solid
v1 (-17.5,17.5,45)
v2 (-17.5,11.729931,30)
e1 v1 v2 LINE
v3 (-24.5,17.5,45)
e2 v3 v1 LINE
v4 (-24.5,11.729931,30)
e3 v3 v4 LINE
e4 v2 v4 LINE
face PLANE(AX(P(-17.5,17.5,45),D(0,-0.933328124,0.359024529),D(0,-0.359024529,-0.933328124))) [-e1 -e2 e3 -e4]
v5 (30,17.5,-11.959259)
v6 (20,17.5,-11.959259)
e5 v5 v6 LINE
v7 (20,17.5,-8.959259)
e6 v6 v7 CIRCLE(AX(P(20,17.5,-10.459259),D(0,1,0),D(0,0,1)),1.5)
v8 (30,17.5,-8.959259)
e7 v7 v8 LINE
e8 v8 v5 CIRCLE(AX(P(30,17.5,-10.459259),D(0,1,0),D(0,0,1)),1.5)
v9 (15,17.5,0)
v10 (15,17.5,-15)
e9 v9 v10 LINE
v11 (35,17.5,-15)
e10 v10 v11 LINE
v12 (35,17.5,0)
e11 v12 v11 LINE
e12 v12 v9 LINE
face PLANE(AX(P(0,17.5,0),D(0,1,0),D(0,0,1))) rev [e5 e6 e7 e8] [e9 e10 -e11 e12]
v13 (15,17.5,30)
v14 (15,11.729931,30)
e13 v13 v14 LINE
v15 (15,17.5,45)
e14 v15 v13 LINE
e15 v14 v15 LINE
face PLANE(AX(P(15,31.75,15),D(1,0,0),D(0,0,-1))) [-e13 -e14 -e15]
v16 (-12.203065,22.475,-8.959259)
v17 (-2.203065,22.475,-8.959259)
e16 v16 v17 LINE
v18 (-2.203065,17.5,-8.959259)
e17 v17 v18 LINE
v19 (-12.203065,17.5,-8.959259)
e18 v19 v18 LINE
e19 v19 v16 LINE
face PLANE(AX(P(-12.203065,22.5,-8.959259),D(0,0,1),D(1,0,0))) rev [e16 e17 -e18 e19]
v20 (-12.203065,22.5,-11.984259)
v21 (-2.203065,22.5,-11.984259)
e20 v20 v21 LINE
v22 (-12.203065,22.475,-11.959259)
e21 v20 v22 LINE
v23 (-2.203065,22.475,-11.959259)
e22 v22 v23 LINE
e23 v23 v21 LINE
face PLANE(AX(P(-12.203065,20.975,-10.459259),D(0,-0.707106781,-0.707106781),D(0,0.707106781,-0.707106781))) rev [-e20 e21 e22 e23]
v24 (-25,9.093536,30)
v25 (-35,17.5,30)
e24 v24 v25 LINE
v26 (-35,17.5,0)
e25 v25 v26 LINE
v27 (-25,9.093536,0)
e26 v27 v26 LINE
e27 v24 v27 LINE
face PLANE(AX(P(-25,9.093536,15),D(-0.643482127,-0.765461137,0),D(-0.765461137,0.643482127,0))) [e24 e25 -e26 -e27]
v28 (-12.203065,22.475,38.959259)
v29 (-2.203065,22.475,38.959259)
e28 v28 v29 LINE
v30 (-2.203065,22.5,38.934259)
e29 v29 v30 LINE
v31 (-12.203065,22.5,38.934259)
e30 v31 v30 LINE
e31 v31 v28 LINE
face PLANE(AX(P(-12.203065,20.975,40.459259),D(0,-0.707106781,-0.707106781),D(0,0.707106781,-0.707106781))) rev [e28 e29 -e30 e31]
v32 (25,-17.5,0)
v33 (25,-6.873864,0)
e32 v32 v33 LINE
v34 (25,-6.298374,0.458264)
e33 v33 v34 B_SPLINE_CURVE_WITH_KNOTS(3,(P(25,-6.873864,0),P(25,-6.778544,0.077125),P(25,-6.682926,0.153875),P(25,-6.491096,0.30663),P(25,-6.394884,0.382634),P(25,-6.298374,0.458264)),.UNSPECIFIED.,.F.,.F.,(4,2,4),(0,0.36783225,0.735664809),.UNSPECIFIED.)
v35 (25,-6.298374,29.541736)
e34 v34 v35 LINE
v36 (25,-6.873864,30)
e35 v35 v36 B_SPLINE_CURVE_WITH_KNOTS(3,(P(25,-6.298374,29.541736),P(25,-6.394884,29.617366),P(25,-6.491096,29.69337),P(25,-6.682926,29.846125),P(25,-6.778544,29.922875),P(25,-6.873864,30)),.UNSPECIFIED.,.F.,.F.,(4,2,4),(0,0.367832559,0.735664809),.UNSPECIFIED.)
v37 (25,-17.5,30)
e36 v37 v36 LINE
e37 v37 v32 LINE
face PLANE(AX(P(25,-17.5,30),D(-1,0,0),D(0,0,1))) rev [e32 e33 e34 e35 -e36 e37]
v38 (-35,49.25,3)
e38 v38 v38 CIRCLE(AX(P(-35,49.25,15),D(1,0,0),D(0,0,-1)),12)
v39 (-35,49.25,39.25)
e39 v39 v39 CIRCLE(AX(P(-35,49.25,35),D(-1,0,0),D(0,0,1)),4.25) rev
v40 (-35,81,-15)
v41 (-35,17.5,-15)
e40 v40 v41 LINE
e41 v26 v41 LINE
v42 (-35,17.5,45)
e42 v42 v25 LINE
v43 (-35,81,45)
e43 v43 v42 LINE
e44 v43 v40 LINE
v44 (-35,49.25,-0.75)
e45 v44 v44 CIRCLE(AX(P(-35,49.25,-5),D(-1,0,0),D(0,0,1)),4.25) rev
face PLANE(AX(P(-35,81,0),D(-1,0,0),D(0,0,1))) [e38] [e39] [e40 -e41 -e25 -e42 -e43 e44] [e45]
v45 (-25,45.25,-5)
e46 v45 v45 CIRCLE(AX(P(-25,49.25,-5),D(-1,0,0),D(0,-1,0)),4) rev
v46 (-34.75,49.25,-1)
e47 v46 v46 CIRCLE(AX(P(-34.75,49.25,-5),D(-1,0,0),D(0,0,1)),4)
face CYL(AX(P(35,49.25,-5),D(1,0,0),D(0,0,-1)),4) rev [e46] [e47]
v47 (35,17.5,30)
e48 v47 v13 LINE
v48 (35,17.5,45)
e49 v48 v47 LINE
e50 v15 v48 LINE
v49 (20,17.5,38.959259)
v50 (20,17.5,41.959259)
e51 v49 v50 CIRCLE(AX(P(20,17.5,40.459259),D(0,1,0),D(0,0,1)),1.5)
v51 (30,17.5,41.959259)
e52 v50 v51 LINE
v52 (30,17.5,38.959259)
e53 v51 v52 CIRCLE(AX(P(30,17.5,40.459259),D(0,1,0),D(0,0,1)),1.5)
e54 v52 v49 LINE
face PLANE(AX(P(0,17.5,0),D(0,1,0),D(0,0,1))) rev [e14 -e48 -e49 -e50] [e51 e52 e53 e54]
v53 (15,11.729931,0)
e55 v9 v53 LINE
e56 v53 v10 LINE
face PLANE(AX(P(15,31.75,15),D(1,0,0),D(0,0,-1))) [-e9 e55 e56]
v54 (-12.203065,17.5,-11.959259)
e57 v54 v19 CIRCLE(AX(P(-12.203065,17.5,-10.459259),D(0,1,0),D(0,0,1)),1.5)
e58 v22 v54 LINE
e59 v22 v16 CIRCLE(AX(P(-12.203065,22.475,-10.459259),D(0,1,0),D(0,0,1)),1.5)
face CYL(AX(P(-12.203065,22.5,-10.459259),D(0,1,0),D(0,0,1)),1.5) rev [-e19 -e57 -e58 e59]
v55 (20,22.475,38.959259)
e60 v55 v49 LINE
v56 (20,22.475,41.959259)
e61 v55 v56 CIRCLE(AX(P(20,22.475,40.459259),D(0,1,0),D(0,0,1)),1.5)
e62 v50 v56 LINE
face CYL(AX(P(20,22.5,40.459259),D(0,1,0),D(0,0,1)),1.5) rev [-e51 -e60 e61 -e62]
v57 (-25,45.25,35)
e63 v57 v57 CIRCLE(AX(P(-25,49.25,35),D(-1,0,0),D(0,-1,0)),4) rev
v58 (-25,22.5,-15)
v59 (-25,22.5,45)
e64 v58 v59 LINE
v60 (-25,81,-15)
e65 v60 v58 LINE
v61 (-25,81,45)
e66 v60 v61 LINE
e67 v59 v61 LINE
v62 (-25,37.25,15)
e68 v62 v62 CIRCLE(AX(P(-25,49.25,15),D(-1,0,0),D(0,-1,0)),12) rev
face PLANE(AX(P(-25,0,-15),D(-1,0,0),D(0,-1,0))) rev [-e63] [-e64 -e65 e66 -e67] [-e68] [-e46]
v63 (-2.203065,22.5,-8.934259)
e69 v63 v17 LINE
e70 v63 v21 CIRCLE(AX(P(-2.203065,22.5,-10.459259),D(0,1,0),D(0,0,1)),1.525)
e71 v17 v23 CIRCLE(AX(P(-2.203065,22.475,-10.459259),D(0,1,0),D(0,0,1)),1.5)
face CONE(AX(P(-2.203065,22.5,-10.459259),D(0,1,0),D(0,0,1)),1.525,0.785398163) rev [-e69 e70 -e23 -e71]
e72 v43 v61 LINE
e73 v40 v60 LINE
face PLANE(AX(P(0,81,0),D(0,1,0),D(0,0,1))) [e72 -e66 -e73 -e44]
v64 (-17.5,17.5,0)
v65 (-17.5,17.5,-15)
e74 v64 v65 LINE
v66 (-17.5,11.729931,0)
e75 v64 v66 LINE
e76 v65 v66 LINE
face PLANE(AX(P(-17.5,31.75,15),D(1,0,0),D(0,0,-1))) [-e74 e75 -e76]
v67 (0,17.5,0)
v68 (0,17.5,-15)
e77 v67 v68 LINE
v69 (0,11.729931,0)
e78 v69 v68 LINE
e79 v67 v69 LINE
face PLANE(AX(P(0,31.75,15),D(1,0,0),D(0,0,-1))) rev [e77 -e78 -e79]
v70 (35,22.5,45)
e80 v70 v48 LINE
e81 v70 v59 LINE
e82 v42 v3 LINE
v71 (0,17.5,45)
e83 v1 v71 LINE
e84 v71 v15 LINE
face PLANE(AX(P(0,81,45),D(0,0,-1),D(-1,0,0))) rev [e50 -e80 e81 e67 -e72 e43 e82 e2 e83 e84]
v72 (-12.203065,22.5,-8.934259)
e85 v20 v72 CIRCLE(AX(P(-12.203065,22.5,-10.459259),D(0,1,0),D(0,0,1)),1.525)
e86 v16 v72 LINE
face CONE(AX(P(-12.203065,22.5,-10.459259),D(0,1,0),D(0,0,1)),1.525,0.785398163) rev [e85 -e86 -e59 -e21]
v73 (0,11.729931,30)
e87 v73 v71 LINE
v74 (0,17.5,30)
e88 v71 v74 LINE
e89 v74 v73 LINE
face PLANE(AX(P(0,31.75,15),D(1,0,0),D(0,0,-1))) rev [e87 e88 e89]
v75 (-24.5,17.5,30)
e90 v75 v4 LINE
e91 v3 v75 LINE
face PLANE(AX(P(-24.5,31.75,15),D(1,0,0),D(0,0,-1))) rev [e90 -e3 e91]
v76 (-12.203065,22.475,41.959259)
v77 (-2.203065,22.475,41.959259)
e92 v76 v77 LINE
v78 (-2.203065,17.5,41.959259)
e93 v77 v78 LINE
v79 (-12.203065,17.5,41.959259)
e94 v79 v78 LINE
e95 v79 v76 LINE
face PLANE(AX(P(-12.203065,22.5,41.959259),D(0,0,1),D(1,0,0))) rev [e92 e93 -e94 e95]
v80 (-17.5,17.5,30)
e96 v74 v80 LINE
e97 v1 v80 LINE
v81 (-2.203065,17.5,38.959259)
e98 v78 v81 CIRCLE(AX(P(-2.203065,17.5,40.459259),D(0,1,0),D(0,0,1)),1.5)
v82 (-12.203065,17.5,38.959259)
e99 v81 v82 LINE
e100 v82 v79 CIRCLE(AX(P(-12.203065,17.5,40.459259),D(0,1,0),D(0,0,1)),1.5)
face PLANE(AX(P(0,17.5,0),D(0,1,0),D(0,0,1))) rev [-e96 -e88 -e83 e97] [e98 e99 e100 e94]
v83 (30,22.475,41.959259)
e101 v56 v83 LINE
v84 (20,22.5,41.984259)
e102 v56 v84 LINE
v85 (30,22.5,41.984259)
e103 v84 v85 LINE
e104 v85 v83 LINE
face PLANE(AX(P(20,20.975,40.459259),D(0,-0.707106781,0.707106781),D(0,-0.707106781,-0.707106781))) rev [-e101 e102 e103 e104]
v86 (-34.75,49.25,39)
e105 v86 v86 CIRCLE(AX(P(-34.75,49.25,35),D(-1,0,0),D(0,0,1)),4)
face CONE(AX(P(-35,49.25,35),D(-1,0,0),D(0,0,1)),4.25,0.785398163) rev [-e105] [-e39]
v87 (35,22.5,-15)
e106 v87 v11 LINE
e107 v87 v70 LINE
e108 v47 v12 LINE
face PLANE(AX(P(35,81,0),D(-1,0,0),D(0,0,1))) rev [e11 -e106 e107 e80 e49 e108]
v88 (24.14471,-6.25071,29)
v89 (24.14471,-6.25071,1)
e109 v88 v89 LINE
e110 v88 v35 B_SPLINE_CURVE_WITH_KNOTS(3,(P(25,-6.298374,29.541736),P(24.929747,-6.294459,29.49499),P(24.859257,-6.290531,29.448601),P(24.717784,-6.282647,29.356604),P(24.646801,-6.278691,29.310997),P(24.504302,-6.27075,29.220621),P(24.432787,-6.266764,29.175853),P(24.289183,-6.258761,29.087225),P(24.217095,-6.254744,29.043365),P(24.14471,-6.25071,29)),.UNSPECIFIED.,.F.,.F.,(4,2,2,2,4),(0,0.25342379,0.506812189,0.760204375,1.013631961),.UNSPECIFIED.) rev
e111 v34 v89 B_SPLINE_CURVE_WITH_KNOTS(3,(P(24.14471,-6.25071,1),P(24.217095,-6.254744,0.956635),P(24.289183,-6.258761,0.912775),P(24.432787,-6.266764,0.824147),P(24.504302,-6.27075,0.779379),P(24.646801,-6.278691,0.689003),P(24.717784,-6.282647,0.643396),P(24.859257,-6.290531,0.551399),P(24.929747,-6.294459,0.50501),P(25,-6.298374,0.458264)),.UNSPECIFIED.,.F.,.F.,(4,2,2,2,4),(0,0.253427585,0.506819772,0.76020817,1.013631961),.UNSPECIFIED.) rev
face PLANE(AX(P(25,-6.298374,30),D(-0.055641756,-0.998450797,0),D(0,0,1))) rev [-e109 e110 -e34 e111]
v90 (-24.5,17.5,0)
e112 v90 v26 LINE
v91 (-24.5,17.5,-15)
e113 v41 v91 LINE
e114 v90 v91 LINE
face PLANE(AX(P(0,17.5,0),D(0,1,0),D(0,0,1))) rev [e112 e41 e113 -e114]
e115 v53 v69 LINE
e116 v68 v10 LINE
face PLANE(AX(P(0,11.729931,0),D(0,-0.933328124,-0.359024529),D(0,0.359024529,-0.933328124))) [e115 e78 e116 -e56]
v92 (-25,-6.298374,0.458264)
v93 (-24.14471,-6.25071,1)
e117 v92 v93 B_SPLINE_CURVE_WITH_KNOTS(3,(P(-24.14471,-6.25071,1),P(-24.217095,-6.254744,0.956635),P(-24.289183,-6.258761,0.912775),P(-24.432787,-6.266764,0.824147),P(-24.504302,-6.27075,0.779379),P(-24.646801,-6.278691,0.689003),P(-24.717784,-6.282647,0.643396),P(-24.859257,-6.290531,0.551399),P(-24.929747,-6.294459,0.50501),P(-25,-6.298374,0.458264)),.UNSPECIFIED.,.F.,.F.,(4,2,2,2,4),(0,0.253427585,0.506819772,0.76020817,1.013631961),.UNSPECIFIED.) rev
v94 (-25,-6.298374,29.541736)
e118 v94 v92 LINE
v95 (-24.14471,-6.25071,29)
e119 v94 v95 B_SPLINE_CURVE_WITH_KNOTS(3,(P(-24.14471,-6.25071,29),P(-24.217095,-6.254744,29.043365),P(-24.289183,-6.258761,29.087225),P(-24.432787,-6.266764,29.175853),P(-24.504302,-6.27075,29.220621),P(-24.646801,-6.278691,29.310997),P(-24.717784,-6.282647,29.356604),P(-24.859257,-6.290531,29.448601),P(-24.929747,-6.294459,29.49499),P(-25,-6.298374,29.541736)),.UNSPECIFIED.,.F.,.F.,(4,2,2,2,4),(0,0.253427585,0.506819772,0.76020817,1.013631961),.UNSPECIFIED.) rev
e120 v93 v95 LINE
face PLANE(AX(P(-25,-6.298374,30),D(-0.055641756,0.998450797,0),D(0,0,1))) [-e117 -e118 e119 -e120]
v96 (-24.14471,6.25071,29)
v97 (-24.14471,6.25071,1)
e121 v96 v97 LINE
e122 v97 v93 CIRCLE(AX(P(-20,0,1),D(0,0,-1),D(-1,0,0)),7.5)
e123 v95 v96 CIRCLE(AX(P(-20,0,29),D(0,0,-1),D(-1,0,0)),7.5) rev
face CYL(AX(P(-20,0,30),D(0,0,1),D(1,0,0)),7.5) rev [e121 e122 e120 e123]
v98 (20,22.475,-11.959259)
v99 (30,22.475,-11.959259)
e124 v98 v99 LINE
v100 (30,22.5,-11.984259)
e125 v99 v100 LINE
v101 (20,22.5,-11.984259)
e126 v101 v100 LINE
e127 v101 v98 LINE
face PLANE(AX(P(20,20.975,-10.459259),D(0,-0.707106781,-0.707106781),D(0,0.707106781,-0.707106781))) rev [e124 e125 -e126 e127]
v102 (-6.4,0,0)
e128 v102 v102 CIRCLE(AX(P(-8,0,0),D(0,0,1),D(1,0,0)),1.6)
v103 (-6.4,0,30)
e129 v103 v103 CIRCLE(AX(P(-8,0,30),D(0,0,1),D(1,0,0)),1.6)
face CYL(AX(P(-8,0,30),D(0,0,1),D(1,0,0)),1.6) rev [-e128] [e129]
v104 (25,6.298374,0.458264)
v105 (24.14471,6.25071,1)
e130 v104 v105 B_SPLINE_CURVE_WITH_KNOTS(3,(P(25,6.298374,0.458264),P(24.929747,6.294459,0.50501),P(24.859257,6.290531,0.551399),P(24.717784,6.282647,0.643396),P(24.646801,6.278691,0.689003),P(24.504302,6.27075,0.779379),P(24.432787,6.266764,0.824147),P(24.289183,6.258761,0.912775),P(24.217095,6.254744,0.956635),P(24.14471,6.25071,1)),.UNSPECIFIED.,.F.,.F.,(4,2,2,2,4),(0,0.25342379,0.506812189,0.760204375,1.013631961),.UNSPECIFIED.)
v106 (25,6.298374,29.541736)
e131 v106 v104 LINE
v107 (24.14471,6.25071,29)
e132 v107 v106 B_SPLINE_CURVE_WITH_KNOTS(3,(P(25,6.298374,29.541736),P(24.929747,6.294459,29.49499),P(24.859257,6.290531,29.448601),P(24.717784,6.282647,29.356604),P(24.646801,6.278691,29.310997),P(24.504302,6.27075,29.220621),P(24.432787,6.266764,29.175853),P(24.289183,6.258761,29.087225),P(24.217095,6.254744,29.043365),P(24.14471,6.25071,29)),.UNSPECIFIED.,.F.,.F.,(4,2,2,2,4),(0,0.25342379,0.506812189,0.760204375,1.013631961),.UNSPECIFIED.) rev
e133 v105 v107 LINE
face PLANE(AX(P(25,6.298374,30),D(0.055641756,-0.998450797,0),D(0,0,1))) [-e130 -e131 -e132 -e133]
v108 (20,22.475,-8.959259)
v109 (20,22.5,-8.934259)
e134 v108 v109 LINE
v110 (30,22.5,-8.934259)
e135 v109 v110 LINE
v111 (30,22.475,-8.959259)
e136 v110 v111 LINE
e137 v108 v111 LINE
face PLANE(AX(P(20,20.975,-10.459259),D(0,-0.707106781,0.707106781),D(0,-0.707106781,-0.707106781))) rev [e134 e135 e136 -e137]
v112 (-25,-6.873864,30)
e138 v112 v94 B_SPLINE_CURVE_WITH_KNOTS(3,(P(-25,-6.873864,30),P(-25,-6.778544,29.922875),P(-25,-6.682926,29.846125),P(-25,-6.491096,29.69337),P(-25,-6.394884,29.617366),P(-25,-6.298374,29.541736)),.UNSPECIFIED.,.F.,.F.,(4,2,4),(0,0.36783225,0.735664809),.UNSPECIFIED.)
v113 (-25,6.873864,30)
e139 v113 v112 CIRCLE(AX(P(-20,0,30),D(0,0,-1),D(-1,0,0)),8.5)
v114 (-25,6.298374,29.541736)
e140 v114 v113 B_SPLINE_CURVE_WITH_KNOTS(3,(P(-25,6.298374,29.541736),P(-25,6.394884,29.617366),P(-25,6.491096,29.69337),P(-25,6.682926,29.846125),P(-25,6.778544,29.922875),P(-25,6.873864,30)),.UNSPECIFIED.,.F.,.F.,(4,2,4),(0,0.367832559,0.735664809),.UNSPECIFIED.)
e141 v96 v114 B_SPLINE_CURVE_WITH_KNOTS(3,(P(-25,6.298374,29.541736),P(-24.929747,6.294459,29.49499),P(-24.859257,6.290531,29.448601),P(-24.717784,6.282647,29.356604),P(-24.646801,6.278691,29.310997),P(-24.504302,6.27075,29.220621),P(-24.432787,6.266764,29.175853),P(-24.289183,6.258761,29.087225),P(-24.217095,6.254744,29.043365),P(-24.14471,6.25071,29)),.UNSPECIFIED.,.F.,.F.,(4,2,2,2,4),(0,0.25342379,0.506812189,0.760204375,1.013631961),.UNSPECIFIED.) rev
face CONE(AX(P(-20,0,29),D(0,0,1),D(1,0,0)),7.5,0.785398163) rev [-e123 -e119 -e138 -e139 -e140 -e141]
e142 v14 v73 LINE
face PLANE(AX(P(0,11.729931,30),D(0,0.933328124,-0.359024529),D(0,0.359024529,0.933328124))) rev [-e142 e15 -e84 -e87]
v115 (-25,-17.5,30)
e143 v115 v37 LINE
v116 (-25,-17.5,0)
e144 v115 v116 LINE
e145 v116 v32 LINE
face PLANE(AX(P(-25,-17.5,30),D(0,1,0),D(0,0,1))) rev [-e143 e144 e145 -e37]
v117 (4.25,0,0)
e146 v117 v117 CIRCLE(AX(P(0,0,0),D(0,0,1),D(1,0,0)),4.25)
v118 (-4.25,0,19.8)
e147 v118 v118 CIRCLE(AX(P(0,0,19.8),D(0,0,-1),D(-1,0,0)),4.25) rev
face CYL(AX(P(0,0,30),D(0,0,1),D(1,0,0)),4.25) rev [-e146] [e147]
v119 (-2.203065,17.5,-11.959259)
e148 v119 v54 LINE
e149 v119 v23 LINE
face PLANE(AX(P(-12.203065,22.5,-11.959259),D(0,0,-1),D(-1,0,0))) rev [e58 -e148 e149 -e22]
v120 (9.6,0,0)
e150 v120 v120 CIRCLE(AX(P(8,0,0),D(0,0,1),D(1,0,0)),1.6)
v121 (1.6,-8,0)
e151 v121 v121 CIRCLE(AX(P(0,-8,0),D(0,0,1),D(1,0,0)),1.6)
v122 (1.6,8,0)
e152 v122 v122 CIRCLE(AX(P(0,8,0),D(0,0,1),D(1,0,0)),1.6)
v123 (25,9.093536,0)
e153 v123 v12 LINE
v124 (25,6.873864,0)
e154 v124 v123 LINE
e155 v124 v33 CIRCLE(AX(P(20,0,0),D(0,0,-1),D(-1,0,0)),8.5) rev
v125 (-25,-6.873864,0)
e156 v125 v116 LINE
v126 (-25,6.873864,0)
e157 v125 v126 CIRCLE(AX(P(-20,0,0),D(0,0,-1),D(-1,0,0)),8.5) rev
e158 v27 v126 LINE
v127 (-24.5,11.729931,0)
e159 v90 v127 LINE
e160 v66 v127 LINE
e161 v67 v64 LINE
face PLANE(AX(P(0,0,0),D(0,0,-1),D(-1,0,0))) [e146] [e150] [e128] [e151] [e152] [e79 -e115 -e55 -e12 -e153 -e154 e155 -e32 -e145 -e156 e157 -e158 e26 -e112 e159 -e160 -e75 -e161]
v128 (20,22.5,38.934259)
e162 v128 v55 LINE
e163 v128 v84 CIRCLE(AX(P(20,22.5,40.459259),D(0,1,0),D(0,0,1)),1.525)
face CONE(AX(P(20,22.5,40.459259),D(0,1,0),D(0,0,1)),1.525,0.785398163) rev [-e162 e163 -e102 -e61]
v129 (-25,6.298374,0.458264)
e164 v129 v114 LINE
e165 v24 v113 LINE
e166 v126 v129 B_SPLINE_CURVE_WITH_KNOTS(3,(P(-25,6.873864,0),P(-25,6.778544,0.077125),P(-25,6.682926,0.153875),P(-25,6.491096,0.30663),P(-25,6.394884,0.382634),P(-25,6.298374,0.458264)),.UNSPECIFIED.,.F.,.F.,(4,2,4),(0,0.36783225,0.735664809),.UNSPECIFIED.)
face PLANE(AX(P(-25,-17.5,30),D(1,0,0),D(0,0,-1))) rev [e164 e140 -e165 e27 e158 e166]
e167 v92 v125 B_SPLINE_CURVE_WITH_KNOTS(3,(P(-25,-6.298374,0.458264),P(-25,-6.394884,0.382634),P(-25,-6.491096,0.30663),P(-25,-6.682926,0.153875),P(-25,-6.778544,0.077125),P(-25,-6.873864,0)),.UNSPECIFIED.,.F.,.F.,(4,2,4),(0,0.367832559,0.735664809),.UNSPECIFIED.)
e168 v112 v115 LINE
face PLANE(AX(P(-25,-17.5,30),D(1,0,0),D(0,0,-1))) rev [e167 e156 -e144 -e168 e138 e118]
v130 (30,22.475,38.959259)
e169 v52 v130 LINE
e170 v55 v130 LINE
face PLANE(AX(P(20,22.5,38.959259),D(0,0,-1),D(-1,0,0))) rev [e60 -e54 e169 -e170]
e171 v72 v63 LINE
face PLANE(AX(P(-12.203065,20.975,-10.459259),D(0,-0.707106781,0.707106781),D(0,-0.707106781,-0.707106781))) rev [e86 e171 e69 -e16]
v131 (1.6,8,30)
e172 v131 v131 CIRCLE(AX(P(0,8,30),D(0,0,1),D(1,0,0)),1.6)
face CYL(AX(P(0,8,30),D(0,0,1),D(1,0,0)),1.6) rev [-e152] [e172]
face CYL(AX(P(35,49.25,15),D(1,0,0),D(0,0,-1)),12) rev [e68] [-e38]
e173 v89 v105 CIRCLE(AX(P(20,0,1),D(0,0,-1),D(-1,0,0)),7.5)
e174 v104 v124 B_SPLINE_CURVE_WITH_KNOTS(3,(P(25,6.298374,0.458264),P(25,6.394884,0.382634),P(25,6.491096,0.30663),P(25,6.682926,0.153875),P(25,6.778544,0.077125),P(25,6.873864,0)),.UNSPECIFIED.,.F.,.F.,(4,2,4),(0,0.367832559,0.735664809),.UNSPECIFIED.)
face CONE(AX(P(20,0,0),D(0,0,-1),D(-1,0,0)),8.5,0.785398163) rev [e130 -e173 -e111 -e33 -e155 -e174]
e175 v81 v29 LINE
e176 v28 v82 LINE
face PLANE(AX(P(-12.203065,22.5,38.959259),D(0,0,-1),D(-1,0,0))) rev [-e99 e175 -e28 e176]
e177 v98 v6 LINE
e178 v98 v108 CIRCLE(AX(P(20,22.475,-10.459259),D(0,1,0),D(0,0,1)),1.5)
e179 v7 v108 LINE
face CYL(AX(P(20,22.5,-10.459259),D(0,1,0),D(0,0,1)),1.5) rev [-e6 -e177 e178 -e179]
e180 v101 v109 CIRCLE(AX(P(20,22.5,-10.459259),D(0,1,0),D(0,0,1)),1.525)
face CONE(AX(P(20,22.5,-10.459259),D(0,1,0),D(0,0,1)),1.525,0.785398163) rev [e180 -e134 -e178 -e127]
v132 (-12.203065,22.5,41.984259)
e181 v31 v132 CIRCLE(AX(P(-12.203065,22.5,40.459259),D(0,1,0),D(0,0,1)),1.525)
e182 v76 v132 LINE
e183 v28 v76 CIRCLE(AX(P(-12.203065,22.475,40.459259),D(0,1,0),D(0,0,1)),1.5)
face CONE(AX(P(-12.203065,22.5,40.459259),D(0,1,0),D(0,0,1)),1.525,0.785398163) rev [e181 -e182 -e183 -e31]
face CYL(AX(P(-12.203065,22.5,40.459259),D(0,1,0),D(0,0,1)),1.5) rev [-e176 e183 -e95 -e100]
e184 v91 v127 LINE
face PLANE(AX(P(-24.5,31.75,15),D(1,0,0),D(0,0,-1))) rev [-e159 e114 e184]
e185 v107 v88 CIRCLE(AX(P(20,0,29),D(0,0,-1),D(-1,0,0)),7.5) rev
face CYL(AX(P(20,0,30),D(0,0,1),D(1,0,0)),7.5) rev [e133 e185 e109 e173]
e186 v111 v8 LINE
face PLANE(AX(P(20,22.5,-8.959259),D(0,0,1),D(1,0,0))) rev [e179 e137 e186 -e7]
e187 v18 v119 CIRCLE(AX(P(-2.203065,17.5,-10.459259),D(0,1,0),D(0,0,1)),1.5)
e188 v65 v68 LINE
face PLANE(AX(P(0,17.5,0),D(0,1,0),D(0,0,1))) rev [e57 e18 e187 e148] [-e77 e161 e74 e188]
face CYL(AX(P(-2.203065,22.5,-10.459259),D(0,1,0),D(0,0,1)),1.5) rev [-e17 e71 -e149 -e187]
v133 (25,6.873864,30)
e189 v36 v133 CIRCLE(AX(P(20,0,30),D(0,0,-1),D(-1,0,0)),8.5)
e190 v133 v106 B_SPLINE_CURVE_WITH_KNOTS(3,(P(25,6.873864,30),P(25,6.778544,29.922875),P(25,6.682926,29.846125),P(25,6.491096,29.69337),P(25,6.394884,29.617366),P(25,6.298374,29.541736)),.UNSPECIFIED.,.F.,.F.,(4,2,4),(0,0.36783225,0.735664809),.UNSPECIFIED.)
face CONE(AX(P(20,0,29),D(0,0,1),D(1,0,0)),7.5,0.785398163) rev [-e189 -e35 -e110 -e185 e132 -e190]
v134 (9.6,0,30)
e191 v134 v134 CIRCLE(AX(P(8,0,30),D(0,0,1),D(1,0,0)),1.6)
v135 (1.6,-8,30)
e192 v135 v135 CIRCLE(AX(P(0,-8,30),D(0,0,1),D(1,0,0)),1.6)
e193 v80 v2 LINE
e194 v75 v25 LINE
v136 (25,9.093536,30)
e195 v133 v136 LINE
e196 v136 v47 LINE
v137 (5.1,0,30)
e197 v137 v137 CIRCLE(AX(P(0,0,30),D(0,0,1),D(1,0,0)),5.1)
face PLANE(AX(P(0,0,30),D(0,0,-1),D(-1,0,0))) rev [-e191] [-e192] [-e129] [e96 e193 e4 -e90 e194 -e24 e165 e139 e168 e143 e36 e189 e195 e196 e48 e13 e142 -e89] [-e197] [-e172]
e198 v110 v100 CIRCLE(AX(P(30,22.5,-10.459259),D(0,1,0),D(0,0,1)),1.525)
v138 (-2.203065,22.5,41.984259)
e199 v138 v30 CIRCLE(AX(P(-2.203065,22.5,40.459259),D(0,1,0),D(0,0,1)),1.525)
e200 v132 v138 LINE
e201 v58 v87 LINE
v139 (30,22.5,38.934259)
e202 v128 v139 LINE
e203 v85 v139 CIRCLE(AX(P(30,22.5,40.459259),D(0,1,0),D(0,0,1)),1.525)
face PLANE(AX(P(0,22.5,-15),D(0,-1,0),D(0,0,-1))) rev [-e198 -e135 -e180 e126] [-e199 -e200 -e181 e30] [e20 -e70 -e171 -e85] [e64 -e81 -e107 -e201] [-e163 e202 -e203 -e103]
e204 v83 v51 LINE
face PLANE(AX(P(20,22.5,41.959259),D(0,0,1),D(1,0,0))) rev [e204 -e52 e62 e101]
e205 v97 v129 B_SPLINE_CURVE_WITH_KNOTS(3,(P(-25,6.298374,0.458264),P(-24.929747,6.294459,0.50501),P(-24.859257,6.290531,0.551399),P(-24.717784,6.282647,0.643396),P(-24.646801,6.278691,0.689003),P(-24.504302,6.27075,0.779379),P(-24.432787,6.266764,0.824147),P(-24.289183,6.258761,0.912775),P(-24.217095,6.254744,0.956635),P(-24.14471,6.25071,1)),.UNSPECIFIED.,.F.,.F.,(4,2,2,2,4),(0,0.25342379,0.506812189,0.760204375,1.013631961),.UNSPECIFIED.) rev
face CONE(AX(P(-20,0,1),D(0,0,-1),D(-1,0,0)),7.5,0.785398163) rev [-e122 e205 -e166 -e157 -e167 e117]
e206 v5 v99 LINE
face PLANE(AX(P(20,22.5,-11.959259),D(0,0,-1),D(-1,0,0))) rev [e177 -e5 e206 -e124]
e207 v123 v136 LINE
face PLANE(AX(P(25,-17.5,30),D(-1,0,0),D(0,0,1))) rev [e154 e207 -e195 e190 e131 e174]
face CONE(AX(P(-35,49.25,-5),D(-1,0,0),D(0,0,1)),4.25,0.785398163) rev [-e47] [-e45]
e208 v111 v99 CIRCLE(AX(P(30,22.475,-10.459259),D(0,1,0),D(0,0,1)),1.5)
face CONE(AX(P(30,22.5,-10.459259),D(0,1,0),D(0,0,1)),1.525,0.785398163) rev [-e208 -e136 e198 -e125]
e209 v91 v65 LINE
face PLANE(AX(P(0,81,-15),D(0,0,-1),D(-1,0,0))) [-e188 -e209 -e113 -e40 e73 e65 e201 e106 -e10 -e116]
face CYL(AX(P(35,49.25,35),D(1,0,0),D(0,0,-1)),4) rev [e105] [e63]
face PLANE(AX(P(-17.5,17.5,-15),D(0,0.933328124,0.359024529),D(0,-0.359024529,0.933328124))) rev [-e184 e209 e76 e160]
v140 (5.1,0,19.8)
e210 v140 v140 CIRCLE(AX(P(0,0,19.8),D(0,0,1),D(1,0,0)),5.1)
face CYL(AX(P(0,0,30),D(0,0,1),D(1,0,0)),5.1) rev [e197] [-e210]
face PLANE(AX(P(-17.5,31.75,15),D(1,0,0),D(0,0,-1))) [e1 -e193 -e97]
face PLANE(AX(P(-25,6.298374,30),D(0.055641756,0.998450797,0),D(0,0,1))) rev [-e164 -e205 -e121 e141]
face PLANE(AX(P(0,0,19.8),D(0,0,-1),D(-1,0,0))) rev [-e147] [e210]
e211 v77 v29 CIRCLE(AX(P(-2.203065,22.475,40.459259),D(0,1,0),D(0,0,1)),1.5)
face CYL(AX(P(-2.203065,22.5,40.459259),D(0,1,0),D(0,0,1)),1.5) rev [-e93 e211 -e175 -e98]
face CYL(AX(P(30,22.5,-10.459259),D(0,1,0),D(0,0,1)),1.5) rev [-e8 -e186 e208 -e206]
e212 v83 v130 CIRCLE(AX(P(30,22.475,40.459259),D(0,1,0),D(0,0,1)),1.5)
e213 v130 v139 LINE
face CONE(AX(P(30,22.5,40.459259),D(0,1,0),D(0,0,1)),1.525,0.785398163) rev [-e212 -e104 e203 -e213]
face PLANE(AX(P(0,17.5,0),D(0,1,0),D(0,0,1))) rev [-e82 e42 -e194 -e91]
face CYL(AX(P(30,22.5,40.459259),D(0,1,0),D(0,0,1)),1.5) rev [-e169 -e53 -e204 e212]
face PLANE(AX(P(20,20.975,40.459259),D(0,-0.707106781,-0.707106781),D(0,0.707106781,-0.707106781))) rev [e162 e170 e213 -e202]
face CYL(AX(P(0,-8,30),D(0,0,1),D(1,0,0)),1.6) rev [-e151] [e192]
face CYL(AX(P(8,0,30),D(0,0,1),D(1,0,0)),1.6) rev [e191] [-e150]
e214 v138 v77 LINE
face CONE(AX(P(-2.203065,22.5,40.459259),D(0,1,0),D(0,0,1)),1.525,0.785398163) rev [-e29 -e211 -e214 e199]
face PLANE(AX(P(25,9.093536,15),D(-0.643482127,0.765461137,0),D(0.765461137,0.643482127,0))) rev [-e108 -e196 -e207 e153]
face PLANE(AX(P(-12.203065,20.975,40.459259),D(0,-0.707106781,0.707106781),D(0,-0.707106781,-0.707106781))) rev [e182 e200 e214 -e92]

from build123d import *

# Parameters (mm, degrees)
SKETCH_1_W               = 50
SKETCH_1_H               = 35
EXTRUDE_1_DEPTH          = 30
HOLE_WIZARD_363_D        = 8.5
HOLE_WIZARD_468_D        = 3.2
HOLE_WIZARD_622_D        = 15
CHAMFER_1_SIZE           = 1
CHAMFER_1_SIZE_2         = 0.708203932
SKETCH_8_W               = 70
SKETCH_8_H               = 60
SKETCH_8_W_2             = 50
SKETCH_8_H_2             = 30
EXTRUDE_2_DEPTH          = 63.5
HOLE_WIZARD_1_D          = 24
HOLE_WIZARD_2_D          = 8
CHAMFER_2_SIZE           = 0.25
CUT_EXTRUDE_2_DEPTH      = 107.705201373
CUT_EXTRUDE_2_DEPTH_BACK = 107.705201373
SKETCH_14_W              = 60
SKETCH_14_H              = 58.5
MM_START                 = 17
MM_2_DEPTH               = 5.5
RIB_1_REACH              = 95.199
SKETCH_25_WALL_W         = 201.46144539
SKETCH_25_WALL_H         = 30
RIB_2_REACH              = 101.05
SKETCH_26_WALL_W         = 216.17250262
SKETCH_26_WALL_H         = 15
RIB_4_REACH              = 108.5
SKETCH_27_WALL_W         = 231.071518272
SKETCH_27_WALL_H         = 7
HOLE_WIZARD_3_D          = 10.2
HOLE_WIZARD_3_DEPTH      = 10.2


with BuildPart() as part:
    # 草图1 → 凸台-拉伸1 (new body)
    with BuildSketch(Plane.XY):
        Rectangle(SKETCH_1_W, SKETCH_1_H)
    extrude(amount=EXTRUDE_1_DEPTH)

    # Hole Wizard 363 (through all)
    with Locations(Plane.XY.offset(30)):
        with Locations((0, 0)):
            Hole(HOLE_WIZARD_363_D / 2)

    # Hole Wizard 468 (through all)
    with Locations(Plane.XY.offset(30)):
        with Locations((8, 0), (0, 8), (-8, 0), (0, -8)):
            Hole(HOLE_WIZARD_468_D / 2)

    # Hole Wizard 622 (through all)
    with Locations(Plane.XY.offset(30)):
        with Locations((20, 0), (-20, 0)):
            Hole(HOLE_WIZARD_622_D / 2)

    # 倒角1
    # the kernel refuses this chamfer: 1, 0.708203932 mm, written as the material it takes off along each edge
    with BuildSketch(Plane(origin=(-20, 0, 0), x_dir=(-0.8790200859122482, 0.4767847402789059, 0), z_dir=(-0.4767847402789059, -0.8790200859122482, 0))) as chamfer_1_piece_1:
        Polygon((7.5, -CHAMFER_1_SIZE), (7.5 + CHAMFER_1_SIZE, 0), (7.5, 0), align=None)
    revolve(axis=Axis((-20, 0, 0), (0, 0, -1)), revolution_arc=303.048763938, mode=Mode.SUBTRACT)
    with BuildSketch(Plane(origin=(-20, 0, 30), x_dir=(-0.879020085912248, 0.47678474027890627, 0), z_dir=(-0.47678474027890627, -0.879020085912248, 0))) as chamfer_1_piece_2:
        Polygon((7.5 + CHAMFER_1_SIZE, 0), (7.5, CHAMFER_1_SIZE), (7.5, 0), align=None)
    revolve(axis=Axis((-20, 0, 30), (0, 0, -1)), revolution_arc=303.048763938, mode=Mode.SUBTRACT)
    with BuildSketch(Plane(origin=(20, 0, 30), x_dir=(0.879020085912248, -0.4767847402789061, 0), z_dir=(0.4767847402789061, 0.879020085912248, 0))) as chamfer_1_piece_3:
        Polygon((7.5 + CHAMFER_1_SIZE, 0), (7.5, CHAMFER_1_SIZE), (7.5, 0), align=None)
    revolve(axis=Axis((20, 0, 30), (0, 0, -1)), revolution_arc=303.048763938, mode=Mode.SUBTRACT)
    with BuildSketch(Plane(origin=(20, 0, 0), x_dir=(0.8790200859122481, 0.476784740278906, 0), z_dir=(0.476784740278906, -0.8790200859122481, 0))) as chamfer_1_piece_4:
        Polygon((7.5, CHAMFER_1_SIZE), (7.5 + CHAMFER_1_SIZE, 0), (7.5, 0), align=None)
    revolve(axis=Axis((20, 0, 0), (0, 0, 1)), revolution_arc=303.048763938, mode=Mode.SUBTRACT)
    with BuildSketch(Plane(origin=(-25, 5.590169944, 32.778051389), x_dir=(0.7914486393779661, 0.611235675682274, 0), z_dir=(0, 0, -1)), Plane(origin=(25, -5.590169944, 32.778051389), x_dir=(-0.7914486393779661, -0.611235675682274, 0), z_dir=(0, 0, -1))) as chamfer_1_piece_5:
        with BuildLine():
            Line((1.080663788, 0), (CHAMFER_1_SIZE_2 * 0.611235676113, -CHAMFER_1_SIZE_2 * 0.791448639936))
            Line((CHAMFER_1_SIZE_2 * 0.611235676113, -CHAMFER_1_SIZE_2 * 0.791448639936), (0, 0))
            ThreePointArc((0, 0), (0.555522087, -0.019473843), (1.080663788, 0))
        make_face()
    extrude(amount=35.556102778, mode=Mode.SUBTRACT)
    with BuildSketch(Plane(origin=(-25, -5.590169944, 32.778051389), x_dir=(0.7914486393779665, -0.6112356756822735, 0), z_dir=(0, 0, -1))) as chamfer_1_piece_6:
        with BuildLine():
            Line((1.080663788, 0), (CHAMFER_1_SIZE_2 * 0.611235676113, CHAMFER_1_SIZE_2 * 0.791448639936))
            Line((CHAMFER_1_SIZE_2 * 0.611235676113, CHAMFER_1_SIZE_2 * 0.791448639936), (0, 0))
            ThreePointArc((0, 0), (0.555522087, 0.019473843), (1.080663788, 0))
        make_face()
    extrude(amount=35.556102778, mode=Mode.SUBTRACT)
    with BuildSketch(Plane(origin=(25, 5.590169944, 32.778051389), x_dir=(0, 1, 0), z_dir=(0, 0, -1))) as chamfer_1_piece_7:
        with BuildLine():
            Line((CHAMFER_1_SIZE_2, 0), (0.660540261, -0.855289885))
            ThreePointArc((0.660540261, -0.855289885), (0.354967464, -0.427764092), (0, 0))
            Line((0, 0), (CHAMFER_1_SIZE_2, 0))
        make_face()
    extrude(amount=35.556102778, mode=Mode.SUBTRACT)

    # 草图8 → 凸台-拉伸2 (add)
    # profile 1 of 5: a face of its own
    with BuildSketch(Plane(origin=(0, 17.5, 0), x_dir=(1, 0, 0), z_dir=(0, 1, 0))):
        with Locations((0, -15)):
            Rectangle(SKETCH_8_W, SKETCH_8_H)
        with Locations((0, -15)):
            Rectangle(SKETCH_8_W_2, SKETCH_8_H_2, mode=Mode.SUBTRACT)
    # profile 2 of 5: a face of its own
    with BuildSketch(Plane(origin=(0, 17.5, 0), x_dir=(1, 0, 0), z_dir=(0, 1, 0))):
        Polygon((25, 0), (0, -15), (25, -30), align=None)
    # profile 3 of 5: a face of its own
    with BuildSketch(Plane(origin=(0, 17.5, 0), x_dir=(1, 0, 0), z_dir=(0, 1, 0))):
        Polygon((25, -30), (0, -15), (-25, -30), align=None)
    # profile 4 of 5: a face of its own
    with BuildSketch(Plane(origin=(0, 17.5, 0), x_dir=(1, 0, 0), z_dir=(0, 1, 0))):
        Polygon((0, -15), (-25, 0), (-25, -30), align=None)
    # profile 5 of 5: a face of its own
    with BuildSketch(Plane(origin=(0, 17.5, 0), x_dir=(1, 0, 0), z_dir=(0, 1, 0))):
        Polygon((25, 0), (-25, 0), (0, -15), align=None)
    extrude(amount=EXTRUDE_2_DEPTH)

    # 孔1 (through all)
    with Locations(Plane(origin=(35, 0, 0), x_dir=(0, 0, -1), z_dir=(1, 0, 0))):
        with Locations((-15, 49.25)):
            Hole(HOLE_WIZARD_1_D / 2)

    # 孔2 (through all)
    with Locations(Plane(origin=(35, 0, 0), x_dir=(0, 0, -1), z_dir=(1, 0, 0))):
        with Locations((5, 49.25), (-35, 49.25)):
            Hole(HOLE_WIZARD_2_D / 2)

    # 倒角2
    chamfer_2_edges = [part.edges().sort_by_distance(p)[0] for p in [
        (-35, 49.25, 31),
        (-35, 49.25, -9),
    ]]
    chamfer(chamfer_2_edges, length=CHAMFER_2_SIZE)

    # 草图14 → 切除-拉伸2 (cut, two sides: drawn at the far end of the back side and taken through both)
    with BuildSketch(Plane.XY.offset(45).offset(-CUT_EXTRUDE_2_DEPTH_BACK)):
        with Locations((5, 51.75)):
            Rectangle(SKETCH_14_W, SKETCH_14_H)
    extrude(amount=CUT_EXTRUDE_2_DEPTH + CUT_EXTRUDE_2_DEPTH_BACK, mode=Mode.SUBTRACT)

    # 大小mm 暗销槽口2: read off the stored shape, not the designer's step
    # 大小mm 暗销槽口2 outline → 大小mm 暗销槽口2 (cut)
    with BuildSketch(Plane(origin=(0, 0, 0), x_dir=(1, 0, 0), z_dir=(0, 1, 0)).offset(MM_START)):
        with BuildLine():
            Line((30, 11.959259259), (20, 11.959259259))
            ThreePointArc((20, 11.959259259), (18.5, 10.459259259), (20, 8.959259259))
            Line((20, 8.959259259), (30, 8.959259259))
            ThreePointArc((30, 8.959259259), (31.5, 10.459259259), (30, 11.959259259))
        make_face()
        with BuildLine():
            ThreePointArc((-12.203065134, 11.959259259), (-13.703065134, 10.459259259), (-12.203065134, 8.959259259))
            Line((-12.203065134, 8.959259259), (-2.203065134, 8.959259259))
            ThreePointArc((-2.203065134, 8.959259259), (-0.703065134, 10.459259259), (-2.203065134, 11.959259259))
            Line((-2.203065134, 11.959259259), (-12.203065134, 11.959259259))
        make_face()
    mm_2 = extrude(amount=MM_2_DEPTH, mode=Mode.SUBTRACT)

    # mm _2 2: loft between two sections, ruled curve by curve
    mm_2_2_from = [
        Edge.make_three_point_arc((30, 22.475, -8.959259259), (31.060660172, 22.475, -9.398599087), (31.5, 22.475, -10.459259259)),
        Edge.make_three_point_arc((31.5, 22.475, -10.459259259), (31.060660172, 22.475, -11.519919431), (30, 22.475, -11.959259259)),
        Edge.make_three_point_arc((20, 22.475, -11.959259259), (18.939339828, 22.475, -11.519919431), (18.5, 22.475, -10.459259259)),
        Edge.make_three_point_arc((18.5, 22.475, -10.459259259), (18.939339828, 22.475, -9.398599087), (20, 22.475, -8.959259259)),
        Edge.make_line((30, 22.475, -11.959259259), (20, 22.475, -11.959259259)),
        Edge.make_line((30, 22.475, -8.959259259), (20, 22.475, -8.959259259)),
    ]
    mm_2_2_to = [
        Edge.make_three_point_arc((30, 22.5, -8.934259259), (31.078337841, 22.5, -9.380921418), (31.525, 22.5, -10.459259259)),
        Edge.make_three_point_arc((31.525, 22.5, -10.459259259), (31.078337841, 22.5, -11.537597101), (30, 22.5, -11.984259259)),
        Edge.make_three_point_arc((20, 22.5, -11.984259259), (18.921662159, 22.5, -11.537597101), (18.475, 22.5, -10.459259259)),
        Edge.make_three_point_arc((18.475, 22.5, -10.459259259), (18.921662159, 22.5, -9.380921418), (20, 22.5, -8.934259259)),
        Edge.make_line((30, 22.5, -11.984259259), (20, 22.5, -11.984259259)),
        Edge.make_line((30, 22.5, -8.934259259), (20, 22.5, -8.934259259)),
    ]
    mm_2_2 = Solid(Shell([*[Face.make_surface_from_curves(mm_2_2_from[k], mm_2_2_to[k]) for k in range(6)], Face(Wire(mm_2_2_from)), Face(Wire(mm_2_2_to))]))
    add(mm_2_2, mode=Mode.SUBTRACT)

    # mm _2 3: loft between two sections, ruled curve by curve
    mm_2_3_from = [
        Edge.make_three_point_arc((-2.203065134, 22.475, -8.959259259), (-1.142404962, 22.475, -9.398599087), (-0.703065134, 22.475, -10.459259259)),
        Edge.make_three_point_arc((-0.703065134, 22.475, -10.459259259), (-1.142404962, 22.475, -11.519919431), (-2.203065134, 22.475, -11.959259259)),
        Edge.make_three_point_arc((-12.203065134, 22.475, -11.959259259), (-13.263725306, 22.475, -11.519919431), (-13.703065134, 22.475, -10.459259259)),
        Edge.make_three_point_arc((-13.703065134, 22.475, -10.459259259), (-13.263725306, 22.475, -9.398599087), (-12.203065134, 22.475, -8.959259259)),
        Edge.make_line((-2.203065134, 22.475, -11.959259259), (-12.203065134, 22.475, -11.959259259)),
        Edge.make_line((-2.203065134, 22.475, -8.959259259), (-12.203065134, 22.475, -8.959259259)),
    ]
    mm_2_3_to = [
        Edge.make_three_point_arc((-2.203065134, 22.5, -8.934259259), (-1.124727293, 22.5, -9.380921418), (-0.678065134, 22.5, -10.459259259)),
        Edge.make_three_point_arc((-0.678065134, 22.5, -10.459259259), (-1.124727293, 22.5, -11.537597101), (-2.203065134, 22.5, -11.984259259)),
        Edge.make_three_point_arc((-12.203065134, 22.5, -11.984259259), (-13.281402975, 22.5, -11.537597101), (-13.728065134, 22.5, -10.459259259)),
        Edge.make_three_point_arc((-13.728065134, 22.5, -10.459259259), (-13.281402975, 22.5, -9.380921418), (-12.203065134, 22.5, -8.934259259)),
        Edge.make_line((-2.203065134, 22.5, -11.984259259), (-12.203065134, 22.5, -11.984259259)),
        Edge.make_line((-2.203065134, 22.5, -8.934259259), (-12.203065134, 22.5, -8.934259259)),
    ]
    mm_2_3 = Solid(Shell([*[Face.make_surface_from_curves(mm_2_3_from[k], mm_2_3_to[k]) for k in range(6)], Face(Wire(mm_2_3_from)), Face(Wire(mm_2_3_to))]))
    add(mm_2_3, mode=Mode.SUBTRACT)

    # 镜向1: 大小mm 暗销槽口2, mm _2 2, mm _2 3 across plane
    add(mm_2.mirror(Plane(origin=(0, 0, 15), x_dir=(1, 0, 0), z_dir=(0, 0, -1))), mode=Mode.SUBTRACT)
    add(mm_2_2.mirror(Plane(origin=(0, 0, 15), x_dir=(1, 0, 0), z_dir=(0, 0, -1))), mode=Mode.SUBTRACT)
    add(mm_2_3.mirror(Plane(origin=(0, 0, 15), x_dir=(1, 0, 0), z_dir=(0, 0, -1))), mode=Mode.SUBTRACT)

    # 草图25 wall → 筋1 (add, up to next)
    with BuildSketch(Plane(origin=(-30, 13.296768148, 15), x_dir=(-0.765461137236, 0.6434821267, 0), z_dir=(0.6434821267, 0.765461137236, 0)), mode=Mode.PRIVATE) as rib_1_sk1:
        Rectangle(SKETCH_25_WALL_W, SKETCH_25_WALL_H)
    rib_1_tool1 = extrude(rib_1_sk1.sketch, amount=RIB_1_REACH, mode=Mode.PRIVATE) - part.part
    rib_1 = rib_1_tool1.solids().sort_by_distance((-30, 13.296768148, 15))[0]
    add(rib_1)

    # 镜向2: 筋1 across plane
    add(rib_1.mirror(Plane(origin=(0, 0, 0), x_dir=(0, 0, 1), z_dir=(1, 0, 0))))

    # 草图26 wall → 筋2 (add, up to next)
    with BuildSketch(Plane(origin=(0, 14.614965359, 37.5), x_dir=(0, 0.359024529342, 0.933328124151), z_dir=(0, -0.933328124151, 0.359024529342)), mode=Mode.PRIVATE) as rib_2_sk1:
        with Locations((0, -7.5)):
            Rectangle(SKETCH_26_WALL_W, SKETCH_26_WALL_H)
    rib_2_tool1 = extrude(rib_2_sk1.sketch, amount=-RIB_2_REACH, mode=Mode.PRIVATE) - part.part
    rib_2 = rib_2_tool1.solids().sort_by_distance((0, 14.614965359, 37.5))[0]
    add(rib_2)

    # 草图27 wall → 筋4 (add, up to next)
    with BuildSketch(Plane(origin=(-17.5, 14.614965359, 37.5), x_dir=(0, -0.359024529342, -0.933328124151), z_dir=(0, 0.933328124151, -0.359024529342)), mode=Mode.PRIVATE) as rib_4_sk1:
        with Locations((0, 3.5)):
            Rectangle(SKETCH_27_WALL_W, SKETCH_27_WALL_H)
    rib_4_tool1 = extrude(rib_4_sk1.sketch, amount=RIB_4_REACH, mode=Mode.PRIVATE) - part.part
    rib_4 = rib_4_tool1.solids().sort_by_distance((-17.5, 14.614965359, 37.5))[0]
    add(rib_4)

    # 镜向4: 筋2, 筋4 across plane
    add(rib_2.mirror(Plane(origin=(0, 0, 15), x_dir=(1, 0, 0), z_dir=(0, 0, -1))))
    add(rib_4.mirror(Plane(origin=(0, 0, 15), x_dir=(1, 0, 0), z_dir=(0, 0, -1))))

    # 孔3
    with Locations(Plane.XY.offset(30)):
        with Locations((0, 0)):
            Hole(HOLE_WIZARD_3_D / 2, depth=HOLE_WIZARD_3_DEPTH)


solid = part.part
